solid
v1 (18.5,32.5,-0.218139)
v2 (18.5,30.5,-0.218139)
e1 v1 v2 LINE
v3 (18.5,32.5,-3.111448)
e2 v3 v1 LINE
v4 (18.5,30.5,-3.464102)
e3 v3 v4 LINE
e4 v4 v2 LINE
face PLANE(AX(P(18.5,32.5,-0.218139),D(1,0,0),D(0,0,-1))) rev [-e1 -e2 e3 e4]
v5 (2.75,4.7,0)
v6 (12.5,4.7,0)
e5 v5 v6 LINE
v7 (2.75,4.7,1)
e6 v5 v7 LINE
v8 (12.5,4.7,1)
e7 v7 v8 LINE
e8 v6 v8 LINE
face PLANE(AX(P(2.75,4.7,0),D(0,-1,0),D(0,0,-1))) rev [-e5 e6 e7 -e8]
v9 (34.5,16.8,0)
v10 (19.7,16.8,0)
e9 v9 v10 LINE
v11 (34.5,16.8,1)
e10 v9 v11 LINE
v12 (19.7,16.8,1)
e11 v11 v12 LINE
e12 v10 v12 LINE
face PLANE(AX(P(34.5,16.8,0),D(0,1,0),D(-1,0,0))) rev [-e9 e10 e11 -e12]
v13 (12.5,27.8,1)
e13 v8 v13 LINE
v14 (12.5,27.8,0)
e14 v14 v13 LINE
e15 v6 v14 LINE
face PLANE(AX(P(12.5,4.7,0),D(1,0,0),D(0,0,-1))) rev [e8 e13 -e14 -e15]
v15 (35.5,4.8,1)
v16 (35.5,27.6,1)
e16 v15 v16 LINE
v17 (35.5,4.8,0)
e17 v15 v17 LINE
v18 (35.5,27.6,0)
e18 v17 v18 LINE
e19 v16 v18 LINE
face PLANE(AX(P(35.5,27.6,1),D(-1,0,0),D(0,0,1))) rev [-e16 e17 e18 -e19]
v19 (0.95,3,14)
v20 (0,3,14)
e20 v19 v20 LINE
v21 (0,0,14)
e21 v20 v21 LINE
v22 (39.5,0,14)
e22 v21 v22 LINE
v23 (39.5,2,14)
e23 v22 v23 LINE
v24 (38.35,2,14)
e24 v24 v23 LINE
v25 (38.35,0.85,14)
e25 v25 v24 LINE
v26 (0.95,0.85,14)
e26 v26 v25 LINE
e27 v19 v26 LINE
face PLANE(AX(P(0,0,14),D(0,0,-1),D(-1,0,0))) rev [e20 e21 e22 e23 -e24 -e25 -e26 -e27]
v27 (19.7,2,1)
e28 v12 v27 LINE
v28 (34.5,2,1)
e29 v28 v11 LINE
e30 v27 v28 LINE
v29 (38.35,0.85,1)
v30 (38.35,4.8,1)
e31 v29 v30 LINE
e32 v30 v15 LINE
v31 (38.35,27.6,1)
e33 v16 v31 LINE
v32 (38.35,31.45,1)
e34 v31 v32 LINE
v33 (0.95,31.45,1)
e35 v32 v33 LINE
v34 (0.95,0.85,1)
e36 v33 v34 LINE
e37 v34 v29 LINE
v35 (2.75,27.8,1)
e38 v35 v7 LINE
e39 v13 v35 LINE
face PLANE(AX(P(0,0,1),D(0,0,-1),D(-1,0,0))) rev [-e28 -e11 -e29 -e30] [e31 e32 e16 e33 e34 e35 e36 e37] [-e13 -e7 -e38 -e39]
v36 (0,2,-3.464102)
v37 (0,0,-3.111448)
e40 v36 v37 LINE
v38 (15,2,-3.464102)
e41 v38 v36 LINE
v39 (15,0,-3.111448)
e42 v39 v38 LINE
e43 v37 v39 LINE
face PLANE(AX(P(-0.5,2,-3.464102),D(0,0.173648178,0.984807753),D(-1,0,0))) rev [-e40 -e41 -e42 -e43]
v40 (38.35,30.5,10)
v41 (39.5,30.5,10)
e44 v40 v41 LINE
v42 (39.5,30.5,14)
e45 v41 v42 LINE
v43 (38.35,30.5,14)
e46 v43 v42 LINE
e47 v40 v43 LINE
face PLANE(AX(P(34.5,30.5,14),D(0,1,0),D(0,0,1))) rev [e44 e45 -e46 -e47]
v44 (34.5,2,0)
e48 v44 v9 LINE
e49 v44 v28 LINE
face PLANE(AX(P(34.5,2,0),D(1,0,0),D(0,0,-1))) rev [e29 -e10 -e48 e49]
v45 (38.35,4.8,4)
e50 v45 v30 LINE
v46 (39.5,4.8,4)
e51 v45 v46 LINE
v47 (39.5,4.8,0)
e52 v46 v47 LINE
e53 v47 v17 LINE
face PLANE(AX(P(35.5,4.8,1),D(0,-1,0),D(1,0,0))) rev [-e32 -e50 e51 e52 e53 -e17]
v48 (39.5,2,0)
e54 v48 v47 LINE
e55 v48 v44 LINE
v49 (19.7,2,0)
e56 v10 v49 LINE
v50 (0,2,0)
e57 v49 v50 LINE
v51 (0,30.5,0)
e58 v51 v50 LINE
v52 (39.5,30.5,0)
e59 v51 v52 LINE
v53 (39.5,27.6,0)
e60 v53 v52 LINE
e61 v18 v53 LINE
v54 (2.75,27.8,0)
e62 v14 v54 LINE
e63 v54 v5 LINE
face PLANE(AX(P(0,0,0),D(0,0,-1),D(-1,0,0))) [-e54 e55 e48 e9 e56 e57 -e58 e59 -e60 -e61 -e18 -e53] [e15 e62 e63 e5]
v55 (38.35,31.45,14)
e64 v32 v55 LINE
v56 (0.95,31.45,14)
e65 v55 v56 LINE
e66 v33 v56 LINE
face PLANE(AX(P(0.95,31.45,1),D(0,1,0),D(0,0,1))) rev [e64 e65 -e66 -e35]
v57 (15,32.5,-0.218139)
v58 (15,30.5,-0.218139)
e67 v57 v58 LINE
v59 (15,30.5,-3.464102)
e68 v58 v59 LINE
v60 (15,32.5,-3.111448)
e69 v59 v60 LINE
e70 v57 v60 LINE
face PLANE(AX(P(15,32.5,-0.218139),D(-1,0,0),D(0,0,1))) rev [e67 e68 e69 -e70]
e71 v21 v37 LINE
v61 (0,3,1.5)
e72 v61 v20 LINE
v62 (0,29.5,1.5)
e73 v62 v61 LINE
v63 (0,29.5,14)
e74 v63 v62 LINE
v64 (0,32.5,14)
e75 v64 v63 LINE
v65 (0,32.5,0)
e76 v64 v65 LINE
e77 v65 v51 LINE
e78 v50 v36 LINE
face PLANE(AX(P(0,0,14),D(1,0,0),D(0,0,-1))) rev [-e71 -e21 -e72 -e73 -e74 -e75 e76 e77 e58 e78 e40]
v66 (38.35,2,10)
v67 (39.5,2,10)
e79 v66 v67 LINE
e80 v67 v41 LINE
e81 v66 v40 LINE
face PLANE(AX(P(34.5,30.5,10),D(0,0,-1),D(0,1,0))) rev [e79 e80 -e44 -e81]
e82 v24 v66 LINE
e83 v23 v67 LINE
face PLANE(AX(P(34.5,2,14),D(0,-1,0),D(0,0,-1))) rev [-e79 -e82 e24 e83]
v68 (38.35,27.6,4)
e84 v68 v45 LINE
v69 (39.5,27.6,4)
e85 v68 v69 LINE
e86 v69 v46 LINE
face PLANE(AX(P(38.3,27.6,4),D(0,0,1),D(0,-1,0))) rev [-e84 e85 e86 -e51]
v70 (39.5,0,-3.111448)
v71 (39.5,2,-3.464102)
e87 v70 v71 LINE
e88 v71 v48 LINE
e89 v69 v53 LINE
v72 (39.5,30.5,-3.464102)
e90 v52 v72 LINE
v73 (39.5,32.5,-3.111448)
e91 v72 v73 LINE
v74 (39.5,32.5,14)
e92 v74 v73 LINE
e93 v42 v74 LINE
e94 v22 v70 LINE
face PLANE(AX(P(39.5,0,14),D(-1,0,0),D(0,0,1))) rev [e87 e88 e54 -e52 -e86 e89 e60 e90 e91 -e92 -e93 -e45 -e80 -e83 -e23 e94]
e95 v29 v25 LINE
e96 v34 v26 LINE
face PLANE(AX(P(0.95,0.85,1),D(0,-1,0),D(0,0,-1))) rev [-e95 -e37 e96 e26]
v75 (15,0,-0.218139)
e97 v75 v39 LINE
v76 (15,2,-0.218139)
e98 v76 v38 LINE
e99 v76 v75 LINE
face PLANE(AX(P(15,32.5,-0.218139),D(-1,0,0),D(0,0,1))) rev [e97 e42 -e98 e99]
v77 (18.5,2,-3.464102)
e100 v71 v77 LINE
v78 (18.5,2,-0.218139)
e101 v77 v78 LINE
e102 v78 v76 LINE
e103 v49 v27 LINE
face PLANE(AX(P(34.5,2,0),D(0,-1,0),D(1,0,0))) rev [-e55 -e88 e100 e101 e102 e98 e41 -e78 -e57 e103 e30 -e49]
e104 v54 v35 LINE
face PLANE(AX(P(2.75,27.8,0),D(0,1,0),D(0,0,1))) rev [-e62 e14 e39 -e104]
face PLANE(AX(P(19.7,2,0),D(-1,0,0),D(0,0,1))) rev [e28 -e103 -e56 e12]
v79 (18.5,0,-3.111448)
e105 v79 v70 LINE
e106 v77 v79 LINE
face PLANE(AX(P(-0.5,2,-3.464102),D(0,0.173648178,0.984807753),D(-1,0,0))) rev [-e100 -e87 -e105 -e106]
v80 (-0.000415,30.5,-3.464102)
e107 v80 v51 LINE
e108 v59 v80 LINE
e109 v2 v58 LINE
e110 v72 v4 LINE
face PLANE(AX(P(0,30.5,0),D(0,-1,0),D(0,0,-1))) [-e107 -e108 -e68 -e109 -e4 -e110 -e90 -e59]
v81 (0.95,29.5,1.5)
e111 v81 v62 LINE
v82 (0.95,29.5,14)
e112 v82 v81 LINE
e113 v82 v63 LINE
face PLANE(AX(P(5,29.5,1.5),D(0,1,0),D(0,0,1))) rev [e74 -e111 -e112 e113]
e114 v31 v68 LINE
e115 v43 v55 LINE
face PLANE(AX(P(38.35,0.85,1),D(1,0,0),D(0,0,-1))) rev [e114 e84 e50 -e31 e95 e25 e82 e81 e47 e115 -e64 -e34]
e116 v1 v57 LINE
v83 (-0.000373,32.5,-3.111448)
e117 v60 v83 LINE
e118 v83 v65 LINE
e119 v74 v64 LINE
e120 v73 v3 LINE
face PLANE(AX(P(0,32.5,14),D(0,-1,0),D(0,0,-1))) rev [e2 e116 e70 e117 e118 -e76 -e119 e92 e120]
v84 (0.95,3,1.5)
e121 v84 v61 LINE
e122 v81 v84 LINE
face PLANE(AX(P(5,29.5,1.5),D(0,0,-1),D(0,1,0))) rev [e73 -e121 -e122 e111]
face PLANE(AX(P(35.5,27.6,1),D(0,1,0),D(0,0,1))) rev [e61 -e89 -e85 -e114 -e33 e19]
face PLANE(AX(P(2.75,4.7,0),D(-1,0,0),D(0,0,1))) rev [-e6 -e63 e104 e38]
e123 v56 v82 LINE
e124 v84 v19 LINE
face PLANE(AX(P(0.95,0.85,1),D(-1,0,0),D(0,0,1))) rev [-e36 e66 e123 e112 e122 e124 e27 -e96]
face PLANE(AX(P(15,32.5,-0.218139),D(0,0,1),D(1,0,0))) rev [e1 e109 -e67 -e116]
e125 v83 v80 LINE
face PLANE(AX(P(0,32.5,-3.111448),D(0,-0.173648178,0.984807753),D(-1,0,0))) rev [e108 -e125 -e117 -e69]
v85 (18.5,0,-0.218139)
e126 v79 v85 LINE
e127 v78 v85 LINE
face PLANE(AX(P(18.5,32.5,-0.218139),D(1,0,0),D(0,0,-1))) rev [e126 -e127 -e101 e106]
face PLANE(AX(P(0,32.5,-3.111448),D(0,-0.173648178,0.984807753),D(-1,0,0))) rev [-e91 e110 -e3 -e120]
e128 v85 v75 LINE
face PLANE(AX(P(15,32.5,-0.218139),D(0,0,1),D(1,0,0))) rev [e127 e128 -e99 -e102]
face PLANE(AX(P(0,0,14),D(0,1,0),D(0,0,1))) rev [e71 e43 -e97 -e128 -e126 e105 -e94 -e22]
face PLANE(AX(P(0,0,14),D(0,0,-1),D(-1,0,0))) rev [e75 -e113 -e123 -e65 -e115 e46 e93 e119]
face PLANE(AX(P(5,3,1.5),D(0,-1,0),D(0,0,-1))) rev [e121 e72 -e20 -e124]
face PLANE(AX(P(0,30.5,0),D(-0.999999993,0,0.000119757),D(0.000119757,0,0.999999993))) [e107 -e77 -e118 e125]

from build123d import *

# Parameters (mm, degrees)
ESQUISSE1_W              = 39.5
ESQUISSE1_H              = 32.5
BOSS_EXTRU_1_DEPTH       = 14
ESQUISSE2_W              = 37.4
ESQUISSE2_H              = 30.6
ENL_V_MAT_EXTRU_1_DEPTH  = 13
ESQUISSE3_W              = 4
ESQUISSE3_H              = 28.5
ENL_V_MAT_EXTRU_2_DEPTH  = 5
ESQUISSE4_W              = 12.5
ESQUISSE4_H              = 26.5
ENL_V_MAT_EXTRU_3_DEPTH  = 5
ESQUISSE6_W              = 14.8
ESQUISSE6_H              = 14.8
ENL_V_MAT_EXTRU_5_DEPTH  = 53.777836257
ESQUISSE7_W              = 9.75
ESQUISSE7_H              = 23.1
ENL_V_MAT_EXTRU_6_DEPTH  = 53.777836257
ESQUISSE8_W              = 4
ESQUISSE8_H              = 22.8
BOSS_EXTRU_3_DEPTH       = 1
ESQUISSE8_2_W            = 4
ESQUISSE8_2_H            = 22.8
ENL_V_MAT_EXTRU_7_DEPTH  = 1
ESQUISSE9_W              = 3
ESQUISSE9_H              = 22.8
ENL_V_MAT_EXTRU_9_DEPTH  = 1.2
BOSS_EXTRU_6_DEPTH       = 2
BOSS_EXTRU_7_DEPTH       = 2
ESQUISSE14_W             = 40
ESQUISSE14_H             = 9.401923789
ENL_V_MAT_EXTRU_10_DEPTH = 54.033008589
ESQUISSE15_W             = 3.5
ESQUISSE15_H             = 4
ENL_V_MAT_EXTRU_11_DEPTH = 54.033008589
CHANFREIN1_SIZE          = 0.352653961
CHANFREIN1_SIZE_2        = 2


with BuildPart() as part:
    # Esquisse1 → Boss.-Extru.1 (new body)
    with BuildSketch(Plane.XY):
        with Locations((19.75, 16.25)):
            Rectangle(ESQUISSE1_W, ESQUISSE1_H)
    extrude(amount=BOSS_EXTRU_1_DEPTH)

    # Esquisse2 → Enlèv. mat.-Extru.1 (cut)
    with BuildSketch(Plane.XY.offset(14)):
        with Locations((19.65, 16.15)):
            Rectangle(ESQUISSE2_W, ESQUISSE2_H)
    extrude(amount=-ENL_V_MAT_EXTRU_1_DEPTH, mode=Mode.SUBTRACT)

    # Esquisse3 → Enlèv. mat.-Extru.2 (cut)
    with BuildSketch(Plane(origin=(39.5, 0, 0), x_dir=(0, 0, -1), z_dir=(1, 0, 0))):
        with Locations((-12, 16.25)):
            Rectangle(ESQUISSE3_W, ESQUISSE3_H)
    extrude(amount=-ENL_V_MAT_EXTRU_2_DEPTH, mode=Mode.SUBTRACT)

    # Esquisse4 → Enlèv. mat.-Extru.3 (cut)
    with BuildSketch(Plane.ZY):
        with Locations((7.75, 16.25)):
            Rectangle(ESQUISSE4_W, ESQUISSE4_H)
    extrude(amount=-ENL_V_MAT_EXTRU_3_DEPTH, mode=Mode.SUBTRACT)

    # Esquisse6 → Enlèv. mat.-Extru.5 (cut, through all)
    with BuildSketch(Plane.XY.offset(1)):
        with Locations((27.1, 9.4)):
            Rectangle(ESQUISSE6_W, ESQUISSE6_H)
    extrude(amount=-ENL_V_MAT_EXTRU_5_DEPTH, mode=Mode.SUBTRACT)

    # Esquisse7 → Enlèv. mat.-Extru.6 (cut, through all)
    with BuildSketch(Plane.XY.offset(1)):
        with Locations((7.625, 16.25)):
            Rectangle(ESQUISSE7_W, ESQUISSE7_H)
    extrude(amount=-ENL_V_MAT_EXTRU_6_DEPTH, mode=Mode.SUBTRACT)

    # Esquisse8 → Boss.-Extru.3 (add)
    with BuildSketch(Plane(origin=(0, 0, 0), x_dir=(-1, 0, 0), z_dir=(0, 0, -1))):
        with Locations((-37.5, 16.2)):
            Rectangle(ESQUISSE8_W, ESQUISSE8_H)
    extrude(amount=-BOSS_EXTRU_3_DEPTH)

    # Esquisse8<2> → Enlèv. mat.-Extru.7 (cut)
    with BuildSketch(Plane(origin=(0, 0, 0), x_dir=(-1, 0, 0), z_dir=(0, 0, -1))):
        with Locations((-37.5, 16.2)):
            Rectangle(ESQUISSE8_2_W, ESQUISSE8_2_H)
    extrude(amount=-ENL_V_MAT_EXTRU_7_DEPTH, mode=Mode.SUBTRACT)

    # Esquisse9 → Enlèv. mat.-Extru.9 (cut)
    with BuildSketch(Plane(origin=(39.5, 0, 0), x_dir=(0, 0, -1), z_dir=(1, 0, 0))):
        with Locations((-2.5, 16.2)):
            Rectangle(ESQUISSE9_W, ESQUISSE9_H)
    extrude(amount=-ENL_V_MAT_EXTRU_9_DEPTH, mode=Mode.SUBTRACT)

    # Esquisse12 → Boss.-Extru.6 (add)
    with BuildSketch(Plane(origin=(0, 32.5, 0), x_dir=(1, 0, 0), z_dir=(0, 1, 0))):
        Polygon((0, 0), (-0.001437079, 12), (39.5, 10), (39.5, 0), align=None)
    extrude(amount=-BOSS_EXTRU_6_DEPTH)

    # Esquisse13 → Boss.-Extru.7 (add)
    with BuildSketch(Plane.XZ):
        Polygon((39.5, 0), (39.5, -9.999999903), (0, -12), (0, 0), align=None)
    extrude(amount=-BOSS_EXTRU_7_DEPTH)

    # Esquisse14 → Enlèv. mat.-Extru.10 (cut, through all)
    with BuildSketch(Plane(origin=(0, 0, 0), x_dir=(-1, 0, 0), z_dir=(0, -1, 0))):
        with Locations((-19.5, 8.165063509)):
            Rectangle(ESQUISSE14_W, ESQUISSE14_H)
    extrude(amount=-ENL_V_MAT_EXTRU_10_DEPTH, mode=Mode.SUBTRACT)

    # Esquisse15 → Enlèv. mat.-Extru.11 (cut, through all)
    with BuildSketch(Plane(origin=(0, 0, 0), x_dir=(-1, 0, 0), z_dir=(0, -1, 0))):
        with Locations((-16.75, 2.218139361)):
            Rectangle(ESQUISSE15_W, ESQUISSE15_H)
    extrude(amount=-ENL_V_MAT_EXTRU_11_DEPTH, mode=Mode.SUBTRACT)

    # Chanfrein1
    # the kernel refuses this chamfer: 2, 0.352653961 mm, written as the material it takes off along each edge
    with BuildSketch(Plane(origin=(-5.197077593, 0, -3.464101615), x_dir=(0, -0.21013876076743054, 0.9776715712462588), z_dir=(1, 0, 0))) as chanfrein1_piece_1:
        Polygon((CHANFREIN1_SIZE * 0.977671572402, -CHANFREIN1_SIZE * 0.210138761016), (-CHANFREIN1_SIZE_2 * 0.210138760767, -CHANFREIN1_SIZE_2 * 0.977671571246), (0, 0), align=None)
    extrude(amount=25.394155186, mode=Mode.SUBTRACT)
    with BuildSketch(Plane(origin=(13.302922407, 0, -3.464101615), x_dir=(0, -0.2101387607674303, 0.9776715712462589), z_dir=(1, 0, 0))) as chanfrein1_piece_2:
        Polygon((CHANFREIN1_SIZE * 0.977671572402, -CHANFREIN1_SIZE * 0.210138761016), (-CHANFREIN1_SIZE_2 * 0.210138760767, -CHANFREIN1_SIZE_2 * 0.977671571246), (0, 0), align=None)
    extrude(amount=31.394155186, mode=Mode.SUBTRACT)
    with BuildSketch(Plane(origin=(-5.197492442, 32.5, -3.464101615), x_dir=(0, 0.21013876076742352, 0.9776715712462605), z_dir=(1, 0, 0))) as chanfrein1_piece_3:
        Polygon((CHANFREIN1_SIZE * 0.977671572402, CHANFREIN1_SIZE * 0.210138761016), (-CHANFREIN1_SIZE_2 * 0.210138760767, CHANFREIN1_SIZE_2 * 0.977671571246), (0, 0), align=None)
    extrude(amount=25.394570035, mode=Mode.SUBTRACT)
    with BuildSketch(Plane(origin=(13.302922407, 32.5, -3.464101615), x_dir=(0, 0.21013876076742327, 0.9776715712462605), z_dir=(1, 0, 0))) as chanfrein1_piece_4:
        Polygon((CHANFREIN1_SIZE * 0.977671572402, CHANFREIN1_SIZE * 0.210138761016), (-CHANFREIN1_SIZE_2 * 0.210138760767, CHANFREIN1_SIZE_2 * 0.977671571246), (0, 0), align=None)
    extrude(amount=31.394155186, mode=Mode.SUBTRACT)


solid = part.part
